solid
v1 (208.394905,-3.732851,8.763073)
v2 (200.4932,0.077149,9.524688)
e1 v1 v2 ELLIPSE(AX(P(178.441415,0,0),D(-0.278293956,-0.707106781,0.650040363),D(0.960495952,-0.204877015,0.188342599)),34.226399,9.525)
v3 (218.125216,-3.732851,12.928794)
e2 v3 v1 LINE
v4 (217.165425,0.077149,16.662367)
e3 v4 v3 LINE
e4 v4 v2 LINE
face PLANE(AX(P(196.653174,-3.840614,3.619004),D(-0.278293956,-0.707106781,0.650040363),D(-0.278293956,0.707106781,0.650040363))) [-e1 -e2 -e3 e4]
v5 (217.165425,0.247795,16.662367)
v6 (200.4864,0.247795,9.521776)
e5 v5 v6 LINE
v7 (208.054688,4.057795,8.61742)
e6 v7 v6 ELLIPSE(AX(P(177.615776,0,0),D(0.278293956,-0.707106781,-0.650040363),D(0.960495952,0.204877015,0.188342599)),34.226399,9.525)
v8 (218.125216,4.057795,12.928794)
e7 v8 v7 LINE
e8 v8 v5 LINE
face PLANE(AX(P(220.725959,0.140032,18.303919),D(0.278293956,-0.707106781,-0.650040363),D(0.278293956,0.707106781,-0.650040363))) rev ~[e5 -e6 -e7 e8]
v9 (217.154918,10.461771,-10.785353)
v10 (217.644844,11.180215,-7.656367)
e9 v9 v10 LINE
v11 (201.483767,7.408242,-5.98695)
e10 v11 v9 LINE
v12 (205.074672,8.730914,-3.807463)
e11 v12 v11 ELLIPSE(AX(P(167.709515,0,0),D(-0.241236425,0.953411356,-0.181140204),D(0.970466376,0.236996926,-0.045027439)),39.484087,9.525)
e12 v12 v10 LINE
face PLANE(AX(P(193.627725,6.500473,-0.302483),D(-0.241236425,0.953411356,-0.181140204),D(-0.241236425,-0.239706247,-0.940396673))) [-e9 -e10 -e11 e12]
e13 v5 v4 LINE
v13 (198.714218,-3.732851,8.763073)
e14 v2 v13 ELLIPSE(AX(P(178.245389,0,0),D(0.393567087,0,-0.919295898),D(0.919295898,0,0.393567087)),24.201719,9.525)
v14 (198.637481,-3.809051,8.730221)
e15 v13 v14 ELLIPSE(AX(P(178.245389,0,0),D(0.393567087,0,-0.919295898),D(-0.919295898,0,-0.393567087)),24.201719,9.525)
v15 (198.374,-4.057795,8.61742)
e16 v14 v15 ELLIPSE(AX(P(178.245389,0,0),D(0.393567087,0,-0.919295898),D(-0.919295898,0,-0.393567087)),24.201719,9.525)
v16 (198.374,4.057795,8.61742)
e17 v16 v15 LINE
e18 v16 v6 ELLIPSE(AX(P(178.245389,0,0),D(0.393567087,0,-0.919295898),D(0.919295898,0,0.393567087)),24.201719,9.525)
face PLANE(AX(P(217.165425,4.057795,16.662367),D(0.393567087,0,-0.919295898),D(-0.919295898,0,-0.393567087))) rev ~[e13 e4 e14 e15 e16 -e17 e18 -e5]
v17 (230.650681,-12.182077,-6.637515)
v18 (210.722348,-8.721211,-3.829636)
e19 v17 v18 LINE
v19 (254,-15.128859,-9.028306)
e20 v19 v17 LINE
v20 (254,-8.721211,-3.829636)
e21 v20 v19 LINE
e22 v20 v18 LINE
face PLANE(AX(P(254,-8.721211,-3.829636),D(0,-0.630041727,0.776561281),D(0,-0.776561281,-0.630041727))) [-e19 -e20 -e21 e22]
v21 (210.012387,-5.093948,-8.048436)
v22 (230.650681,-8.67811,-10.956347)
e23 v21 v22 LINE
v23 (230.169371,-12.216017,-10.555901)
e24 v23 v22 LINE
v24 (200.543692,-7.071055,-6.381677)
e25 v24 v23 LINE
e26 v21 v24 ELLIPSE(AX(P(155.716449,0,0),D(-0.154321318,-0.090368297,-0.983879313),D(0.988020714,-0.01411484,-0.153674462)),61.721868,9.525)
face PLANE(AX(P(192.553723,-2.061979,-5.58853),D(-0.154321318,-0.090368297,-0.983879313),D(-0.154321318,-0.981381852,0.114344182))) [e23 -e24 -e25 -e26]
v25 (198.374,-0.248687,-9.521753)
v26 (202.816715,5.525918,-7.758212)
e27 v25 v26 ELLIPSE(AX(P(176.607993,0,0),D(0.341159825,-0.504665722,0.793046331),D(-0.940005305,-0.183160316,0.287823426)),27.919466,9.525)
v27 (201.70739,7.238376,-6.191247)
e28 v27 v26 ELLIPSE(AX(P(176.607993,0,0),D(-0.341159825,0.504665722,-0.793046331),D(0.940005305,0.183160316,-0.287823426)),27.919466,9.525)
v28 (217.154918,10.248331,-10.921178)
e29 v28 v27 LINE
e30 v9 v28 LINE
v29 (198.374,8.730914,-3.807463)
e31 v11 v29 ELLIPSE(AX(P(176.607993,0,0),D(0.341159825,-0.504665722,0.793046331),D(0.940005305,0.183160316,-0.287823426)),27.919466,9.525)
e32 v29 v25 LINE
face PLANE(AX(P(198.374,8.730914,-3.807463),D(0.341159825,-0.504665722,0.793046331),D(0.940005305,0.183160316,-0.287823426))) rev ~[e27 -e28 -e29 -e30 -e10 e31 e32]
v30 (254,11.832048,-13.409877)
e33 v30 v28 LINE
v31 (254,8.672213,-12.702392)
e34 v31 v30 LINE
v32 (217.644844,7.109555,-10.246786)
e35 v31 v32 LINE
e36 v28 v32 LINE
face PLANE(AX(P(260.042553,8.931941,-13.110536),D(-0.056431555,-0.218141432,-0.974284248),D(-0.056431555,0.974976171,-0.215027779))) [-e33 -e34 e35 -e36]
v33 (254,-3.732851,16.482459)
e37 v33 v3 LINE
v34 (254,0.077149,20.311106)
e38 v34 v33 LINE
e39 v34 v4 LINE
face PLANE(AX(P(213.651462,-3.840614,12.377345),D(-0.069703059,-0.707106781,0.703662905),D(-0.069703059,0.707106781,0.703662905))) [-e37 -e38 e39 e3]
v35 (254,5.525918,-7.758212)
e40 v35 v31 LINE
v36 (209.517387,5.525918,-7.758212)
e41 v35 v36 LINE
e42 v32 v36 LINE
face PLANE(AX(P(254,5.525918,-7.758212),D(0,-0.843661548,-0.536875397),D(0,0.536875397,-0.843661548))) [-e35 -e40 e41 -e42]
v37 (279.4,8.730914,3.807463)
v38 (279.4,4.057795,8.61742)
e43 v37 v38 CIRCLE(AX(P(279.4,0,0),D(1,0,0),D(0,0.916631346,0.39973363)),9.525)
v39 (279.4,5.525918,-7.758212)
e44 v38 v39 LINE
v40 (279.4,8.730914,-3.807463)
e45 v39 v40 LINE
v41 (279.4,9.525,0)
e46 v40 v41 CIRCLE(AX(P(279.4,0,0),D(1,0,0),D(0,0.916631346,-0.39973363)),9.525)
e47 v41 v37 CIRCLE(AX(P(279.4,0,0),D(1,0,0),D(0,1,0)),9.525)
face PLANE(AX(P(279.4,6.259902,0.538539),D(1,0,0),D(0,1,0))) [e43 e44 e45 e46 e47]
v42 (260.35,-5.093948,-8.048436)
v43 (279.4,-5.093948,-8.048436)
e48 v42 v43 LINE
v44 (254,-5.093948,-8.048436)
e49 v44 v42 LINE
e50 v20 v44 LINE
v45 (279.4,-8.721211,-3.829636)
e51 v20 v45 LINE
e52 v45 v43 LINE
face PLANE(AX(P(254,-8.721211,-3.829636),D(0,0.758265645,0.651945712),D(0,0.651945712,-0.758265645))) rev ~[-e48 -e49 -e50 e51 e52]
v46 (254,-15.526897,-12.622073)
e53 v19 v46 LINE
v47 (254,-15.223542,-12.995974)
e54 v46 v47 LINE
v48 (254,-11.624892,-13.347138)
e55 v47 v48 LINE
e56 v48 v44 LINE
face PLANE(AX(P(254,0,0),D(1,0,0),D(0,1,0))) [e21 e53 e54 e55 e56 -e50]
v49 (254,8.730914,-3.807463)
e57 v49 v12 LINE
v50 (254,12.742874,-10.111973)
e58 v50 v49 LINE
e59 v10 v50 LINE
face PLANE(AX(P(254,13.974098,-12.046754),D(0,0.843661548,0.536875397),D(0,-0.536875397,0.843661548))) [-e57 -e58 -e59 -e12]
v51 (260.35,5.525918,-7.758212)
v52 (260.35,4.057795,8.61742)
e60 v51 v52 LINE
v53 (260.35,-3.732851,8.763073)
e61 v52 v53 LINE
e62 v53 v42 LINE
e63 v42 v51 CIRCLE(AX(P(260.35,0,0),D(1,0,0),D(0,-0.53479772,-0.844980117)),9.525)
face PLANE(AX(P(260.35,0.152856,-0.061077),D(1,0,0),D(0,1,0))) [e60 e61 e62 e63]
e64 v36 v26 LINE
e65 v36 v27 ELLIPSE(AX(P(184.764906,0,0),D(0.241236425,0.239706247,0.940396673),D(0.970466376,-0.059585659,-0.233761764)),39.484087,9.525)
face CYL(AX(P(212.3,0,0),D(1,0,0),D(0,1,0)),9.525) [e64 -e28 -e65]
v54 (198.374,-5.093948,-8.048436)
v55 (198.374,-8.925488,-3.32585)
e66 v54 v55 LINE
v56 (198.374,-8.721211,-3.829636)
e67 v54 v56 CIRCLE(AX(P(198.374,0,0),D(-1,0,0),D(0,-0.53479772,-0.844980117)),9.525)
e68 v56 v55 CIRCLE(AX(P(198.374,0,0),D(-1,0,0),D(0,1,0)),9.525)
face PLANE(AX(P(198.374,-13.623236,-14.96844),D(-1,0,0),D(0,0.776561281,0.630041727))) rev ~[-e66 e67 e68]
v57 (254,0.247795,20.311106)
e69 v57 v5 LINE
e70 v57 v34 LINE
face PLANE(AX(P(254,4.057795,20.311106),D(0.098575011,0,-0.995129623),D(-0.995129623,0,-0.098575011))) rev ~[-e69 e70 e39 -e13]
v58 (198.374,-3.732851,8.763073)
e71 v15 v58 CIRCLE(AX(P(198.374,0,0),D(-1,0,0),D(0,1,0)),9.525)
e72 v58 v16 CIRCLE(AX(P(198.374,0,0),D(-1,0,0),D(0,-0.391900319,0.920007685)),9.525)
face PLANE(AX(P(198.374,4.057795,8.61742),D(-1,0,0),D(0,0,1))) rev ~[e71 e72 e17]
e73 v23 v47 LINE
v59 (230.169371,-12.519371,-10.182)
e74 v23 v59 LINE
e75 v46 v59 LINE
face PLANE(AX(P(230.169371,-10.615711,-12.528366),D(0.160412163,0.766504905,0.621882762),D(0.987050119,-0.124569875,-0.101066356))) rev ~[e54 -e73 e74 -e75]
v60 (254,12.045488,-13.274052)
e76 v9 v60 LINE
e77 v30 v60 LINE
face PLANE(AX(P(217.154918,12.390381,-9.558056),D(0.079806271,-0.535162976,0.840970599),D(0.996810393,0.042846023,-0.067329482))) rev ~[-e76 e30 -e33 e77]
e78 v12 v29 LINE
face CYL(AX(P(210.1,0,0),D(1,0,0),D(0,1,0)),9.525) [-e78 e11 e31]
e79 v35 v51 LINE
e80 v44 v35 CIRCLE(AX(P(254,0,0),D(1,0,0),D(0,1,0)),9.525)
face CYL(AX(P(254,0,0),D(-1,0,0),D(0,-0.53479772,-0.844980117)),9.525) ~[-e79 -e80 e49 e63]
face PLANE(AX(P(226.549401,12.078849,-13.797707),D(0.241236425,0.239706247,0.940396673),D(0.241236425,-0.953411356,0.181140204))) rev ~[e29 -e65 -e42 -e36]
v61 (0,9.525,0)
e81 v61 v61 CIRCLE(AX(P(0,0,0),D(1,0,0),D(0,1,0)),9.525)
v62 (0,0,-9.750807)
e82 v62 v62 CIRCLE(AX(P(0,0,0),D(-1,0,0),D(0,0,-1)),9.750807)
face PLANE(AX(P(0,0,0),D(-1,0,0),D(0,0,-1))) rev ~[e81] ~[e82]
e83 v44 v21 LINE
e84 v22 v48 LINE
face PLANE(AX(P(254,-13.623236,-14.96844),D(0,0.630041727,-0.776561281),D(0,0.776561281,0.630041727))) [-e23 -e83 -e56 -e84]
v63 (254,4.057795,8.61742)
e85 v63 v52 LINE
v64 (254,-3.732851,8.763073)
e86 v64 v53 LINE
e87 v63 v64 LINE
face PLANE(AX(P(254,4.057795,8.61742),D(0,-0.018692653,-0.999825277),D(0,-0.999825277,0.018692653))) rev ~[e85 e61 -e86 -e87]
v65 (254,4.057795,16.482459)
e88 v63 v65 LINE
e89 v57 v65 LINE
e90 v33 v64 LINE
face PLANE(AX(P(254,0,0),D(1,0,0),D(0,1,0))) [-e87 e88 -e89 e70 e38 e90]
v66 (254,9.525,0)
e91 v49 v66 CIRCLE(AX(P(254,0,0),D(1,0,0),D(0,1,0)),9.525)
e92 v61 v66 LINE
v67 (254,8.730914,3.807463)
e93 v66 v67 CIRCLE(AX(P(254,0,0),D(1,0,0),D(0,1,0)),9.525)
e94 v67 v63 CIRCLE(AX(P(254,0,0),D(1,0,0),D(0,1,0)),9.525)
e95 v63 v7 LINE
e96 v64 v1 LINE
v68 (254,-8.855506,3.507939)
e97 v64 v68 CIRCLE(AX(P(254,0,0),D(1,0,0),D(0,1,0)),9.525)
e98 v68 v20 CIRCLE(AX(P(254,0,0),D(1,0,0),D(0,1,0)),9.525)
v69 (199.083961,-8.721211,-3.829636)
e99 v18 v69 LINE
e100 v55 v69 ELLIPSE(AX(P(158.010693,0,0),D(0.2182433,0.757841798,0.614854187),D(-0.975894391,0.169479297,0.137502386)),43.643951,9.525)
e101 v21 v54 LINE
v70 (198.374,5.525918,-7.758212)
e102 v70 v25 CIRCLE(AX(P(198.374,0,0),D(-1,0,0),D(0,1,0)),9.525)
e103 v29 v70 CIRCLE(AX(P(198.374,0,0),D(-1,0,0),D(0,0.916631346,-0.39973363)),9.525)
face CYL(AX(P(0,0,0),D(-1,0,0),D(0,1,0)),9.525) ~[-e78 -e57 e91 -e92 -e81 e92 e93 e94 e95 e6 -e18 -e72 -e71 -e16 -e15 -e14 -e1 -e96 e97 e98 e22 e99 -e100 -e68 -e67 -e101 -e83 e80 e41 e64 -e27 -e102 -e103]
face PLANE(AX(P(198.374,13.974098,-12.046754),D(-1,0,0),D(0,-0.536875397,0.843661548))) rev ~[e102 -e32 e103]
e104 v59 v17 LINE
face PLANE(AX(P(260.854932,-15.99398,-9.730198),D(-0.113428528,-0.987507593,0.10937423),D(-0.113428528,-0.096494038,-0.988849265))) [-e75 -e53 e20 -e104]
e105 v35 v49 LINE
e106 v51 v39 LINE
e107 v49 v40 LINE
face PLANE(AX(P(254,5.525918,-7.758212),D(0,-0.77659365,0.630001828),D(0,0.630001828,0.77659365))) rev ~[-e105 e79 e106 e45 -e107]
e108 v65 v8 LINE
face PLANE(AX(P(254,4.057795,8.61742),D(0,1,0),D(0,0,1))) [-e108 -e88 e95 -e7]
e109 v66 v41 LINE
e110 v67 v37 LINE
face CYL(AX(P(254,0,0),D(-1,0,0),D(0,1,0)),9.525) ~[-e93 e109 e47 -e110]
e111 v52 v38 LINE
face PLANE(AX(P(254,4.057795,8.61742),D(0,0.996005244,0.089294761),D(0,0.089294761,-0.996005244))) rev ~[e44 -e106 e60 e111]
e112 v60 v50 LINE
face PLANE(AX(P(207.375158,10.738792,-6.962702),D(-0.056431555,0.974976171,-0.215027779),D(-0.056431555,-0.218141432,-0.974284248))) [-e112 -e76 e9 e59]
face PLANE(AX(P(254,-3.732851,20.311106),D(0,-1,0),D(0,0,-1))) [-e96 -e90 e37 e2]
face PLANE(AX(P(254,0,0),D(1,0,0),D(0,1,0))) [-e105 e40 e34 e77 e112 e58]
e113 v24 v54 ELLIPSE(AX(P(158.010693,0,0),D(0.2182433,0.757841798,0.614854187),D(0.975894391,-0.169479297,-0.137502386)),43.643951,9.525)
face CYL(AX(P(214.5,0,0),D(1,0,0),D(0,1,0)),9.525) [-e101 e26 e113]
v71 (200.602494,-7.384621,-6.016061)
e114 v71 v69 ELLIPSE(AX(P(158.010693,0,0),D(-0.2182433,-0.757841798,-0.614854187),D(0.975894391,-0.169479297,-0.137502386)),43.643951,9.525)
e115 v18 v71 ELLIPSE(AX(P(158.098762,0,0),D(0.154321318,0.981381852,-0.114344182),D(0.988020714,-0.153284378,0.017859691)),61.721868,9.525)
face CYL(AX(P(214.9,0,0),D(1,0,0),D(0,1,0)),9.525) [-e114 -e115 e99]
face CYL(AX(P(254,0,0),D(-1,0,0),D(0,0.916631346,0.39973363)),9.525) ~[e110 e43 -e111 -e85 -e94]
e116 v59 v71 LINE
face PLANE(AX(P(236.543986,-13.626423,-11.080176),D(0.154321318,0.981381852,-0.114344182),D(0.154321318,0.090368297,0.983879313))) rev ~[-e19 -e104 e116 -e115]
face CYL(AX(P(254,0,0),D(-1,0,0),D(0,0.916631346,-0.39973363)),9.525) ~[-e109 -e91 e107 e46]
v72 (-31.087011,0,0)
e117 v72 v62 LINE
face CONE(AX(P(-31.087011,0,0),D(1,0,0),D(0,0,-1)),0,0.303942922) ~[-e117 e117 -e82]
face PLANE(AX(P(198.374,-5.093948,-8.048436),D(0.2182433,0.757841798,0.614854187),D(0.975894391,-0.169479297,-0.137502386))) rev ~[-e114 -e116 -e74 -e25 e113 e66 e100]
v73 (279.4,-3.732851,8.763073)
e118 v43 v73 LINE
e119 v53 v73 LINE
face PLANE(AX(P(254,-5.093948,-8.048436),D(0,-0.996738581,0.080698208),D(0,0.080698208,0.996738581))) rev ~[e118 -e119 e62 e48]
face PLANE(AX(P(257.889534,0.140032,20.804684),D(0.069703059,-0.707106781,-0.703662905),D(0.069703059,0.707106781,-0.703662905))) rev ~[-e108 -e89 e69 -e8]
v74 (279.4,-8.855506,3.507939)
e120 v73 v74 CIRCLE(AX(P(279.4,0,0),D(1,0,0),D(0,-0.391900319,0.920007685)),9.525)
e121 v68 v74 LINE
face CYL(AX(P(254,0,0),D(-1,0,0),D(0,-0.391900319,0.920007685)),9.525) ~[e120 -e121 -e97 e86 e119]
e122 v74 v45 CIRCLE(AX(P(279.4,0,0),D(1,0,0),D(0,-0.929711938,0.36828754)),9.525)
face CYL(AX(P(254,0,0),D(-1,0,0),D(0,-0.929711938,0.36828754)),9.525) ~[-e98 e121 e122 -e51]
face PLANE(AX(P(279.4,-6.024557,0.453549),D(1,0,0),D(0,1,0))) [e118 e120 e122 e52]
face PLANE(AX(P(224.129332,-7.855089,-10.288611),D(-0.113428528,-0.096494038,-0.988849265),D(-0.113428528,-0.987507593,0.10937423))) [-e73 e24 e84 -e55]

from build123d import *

# Parameters (mm, degrees)
F0_R          = 9.525
F1_DEPTH      = 254
F5_DEPTH      = 55.626
F7_DEPTH      = 6.35
F8_DEPTH      = 25.4
F10_DEPTH     = 25.4
F12_DEPTH     = 25.4
F14_DEPTH     = 25.4
F15_T1_DEPTH  = 44.8533405939
F15_T3_DEPTH  = 44.8533405939
F15_T8_DEPTH  = 28.2795963183
F15_S9_R      = 9.525
F15_T10_DEPTH = 17
F15_T14_DEPTH = 27.9095113127
F15_S15_R     = 9.525
F15_T16_DEPTH = 17
F16_T1_DEPTH  = 52.8359208118
F16_T3_DEPTH  = 52.8359208118
F16_T8_DEPTH  = 31.126263523
F16_S9_R      = 9.525
F16_T10_DEPTH = 18
F16_T14_DEPTH = 35.8525293061
F16_S15_R     = 9.525
F16_T16_DEPTH = 20
F17_T1_DEPTH  = 37.2074314298
F17_T3_DEPTH  = 37.2074314298
F17_T8_DEPTH  = 45.6448991689
F17_S9_R      = 9.525
F17_T10_DEPTH = 25
F17_T14_DEPTH = 44.9174010309
F17_S15_R     = 9.525
F17_T16_DEPTH = 25


# Not quite as in the source:
# - a fillet or chamfer that OpenCascade refuses, or shapes differently, is made with other operations: its cross-section is extruded or revolved along the edge and cut away or added
# - a feature names something its author has since deleted; it is built from what else it names


with BuildPart() as f1:
    # F0 (on Right) → F1 (new body)
    with BuildSketch(Plane.YZ):
        Circle(F0_R)
    extrude(amount=F1_DEPTH)

    # F2 (on Front) → F3 (revolve)
    with BuildSketch(Plane.XZ):
        Polygon((0, -9.7508067265), (0, 0), (-31.0870110989, 0), align=None)
    revolve(axis=Axis((-15.5435055494, 0, 0), (-1, 0, 0)))

    # F4 (on face) → F5 (join)
    with BuildSketch(Plane.YZ.offset(254)):
        with BuildLine():
            ThreePointArc((-3.7328505423, 8.7630731955), (0.1780475173, 9.5233357644), (4.0577948396, 8.6174199178))
            Line((4.0577948396, 8.6174199178), (4.0577948396, 20.311106017))
            Line((4.0577948396, 20.311106017), (-3.7328505423, 20.311106017))
            Line((-3.7328505423, 20.311106017), (-3.7328505423, 8.7630731955))
        make_face()
        with BuildLine():
            ThreePointArc((-5.0939482873, -8.0484356149), (-7.2224802699, -6.2097829069), (-8.7212105654, -3.8296359191))
            Line((-8.7212105654, -3.8296359191), (-17.1272028238, -10.6496075168))
            Line((-17.1272028238, -10.6496075168), (-13.6232364185, -14.9684399422))
            Line((-13.6232364185, -14.9684399422), (-5.0939482873, -8.0484356149))
        make_face()
        with BuildLine():
            Line((13.9740978255, -12.0467544007), (8.7309135752, -3.8074628223))
            ThreePointArc((8.7309135752, -3.8074628223), (7.3970545146, -6.0007674099), (5.5259177996, -7.75821226))
            Line((5.5259177996, -7.75821226), (9.9034377135, -14.6371738298))
            Line((9.9034377135, -14.6371738298), (13.9740978255, -12.0467544007))
        make_face()
    extrude(amount=-F5_DEPTH)

    # F6 (on face) → F7 (join)
    with BuildSketch(Plane.YZ.offset(254)):
        Polygon((4.0577948396, 8.6174199178), (-3.7328505423, 8.7630731955), (-5.0939482873, -8.0484356149), (5.5259177996, -7.75821226), align=None)
        with BuildLine():
            Line((5.5259177996, -7.75821226), (-5.0939482873, -8.0484356149))
            ThreePointArc((-5.0939482873, -8.0484356149), (0.2602053301, -9.5214451732), (5.5259177996, -7.75821226))
        make_face()
    extrude(amount=F7_DEPTH)

    # F6 (on face) → F8 (join)
    with BuildSketch(Plane.YZ.offset(254)):
        Polygon((-5.0939482873, -8.0484356149), (-3.7328505423, 8.7630731955), (-8.8555062097, 3.5079388207), (-8.7212105654, -3.8296359191), align=None)
        Polygon((8.7309135752, 3.8074628223), (4.0577948396, 8.6174199178), (5.5259177996, -7.75821226), (8.7309135752, -3.8074628223), align=None)
        with BuildLine():
            ThreePointArc((9.525, 0), (9.3243653083, 1.9446944743), (8.7309135752, 3.8074628223))
            Line((8.7309135752, 3.8074628223), (8.7309135752, -3.8074628223))
            ThreePointArc((8.7309135752, -3.8074628223), (9.3243653083, -1.9446944743), (9.525, 0))
        make_face()
        with BuildLine():
            ThreePointArc((8.7309135752, 3.8074628223), (6.8316679914, 6.6373140242), (4.0577948396, 8.6174199178))
            Line((4.0577948396, 8.6174199178), (8.7309135752, 3.8074628223))
        make_face()
        with BuildLine():
            Line((-8.7212105654, -3.8296359191), (-8.8555062097, 3.5079388207))
            ThreePointArc((-8.8555062097, 3.5079388207), (-9.5234050588, -0.1743017091), (-8.7212105654, -3.8296359191))
        make_face()
        with BuildLine():
            Line((-8.8555062097, 3.5079388207), (-3.7328505423, 8.7630731955))
            ThreePointArc((-3.7328505423, 8.7630731955), (-6.8206151301, 6.6486716152), (-8.8555062097, 3.5079388207))
        make_face()
    extrude(amount=F8_DEPTH)

    # F9 (on face) → F10 (cut)
    with BuildSketch(Plane(origin=(0, 4.0577948396, 0), x_dir=(-1, 0, 0), z_dir=(0, 1, 0))):
        Polygon((-217.1654254198, 16.6623666883), (-198.374, 8.6174199178), (-198.374, 20.311106017), (-254, 20.311106017), align=None)
    extrude(amount=-F10_DEPTH, mode=Mode.SUBTRACT)

    # F11 (on face) → F12 (cut)
    with BuildSketch(Plane(origin=(0, 4.4898005119, 2.8571450721), x_dir=(-1, 0, 0), z_dir=(0, 0.843661548, 0.5368753975))):
        Polygon((-198.374, -7.8996226746), (-217.1549183124, -14.7158552648), (-254, -17.6657327906), (-198.374, -17.6657327906), align=None)
    extrude(amount=-F12_DEPTH, mode=Mode.SUBTRACT)

    # F13 (on face) → F14 (cut)
    with BuildSketch(Plane(origin=(0, 1.9157700793, -2.3612925984), x_dir=(1, 0, 0), z_dir=(0, 0.6300417268, -0.7765612806))):
        Polygon((230.1693707705, 16.137143597), (254, 20.0100196673), (198.374, 20.0100196673), (198.374, 9.0266132778), align=None)
    extrude(amount=-F14_DEPTH, mode=Mode.SUBTRACT)

    # F15: chamfer of 3.81 on 4 edges, made by hand

    # F15_s2 → F15_t1 (cut)
    with BuildSketch(Plane(origin=(257.4244465349, 0, 25.499811331), x_dir=(0, 1, 0), z_dir=(-0.9951296233, 0, -0.098575011))):
        with BuildLine():
            Line((0.1400317661, 4.7181064364), (4.165557913, 8.7436325833))
            Line((4.165557913, 8.7436325833), (4.241757913, 8.7436325833))
            ThreePointArc((4.241757913, 8.7436325833), (4.1339948396, 6.7847510466), (4.1339948396, 4.8258695099))
            Line((4.1339948396, 4.8258695099), (4.0577948396, 4.7496695099))
            ThreePointArc((4.0577948396, 4.7496695099), (2.0989133028, 4.7496695099), (0.1400317661, 4.6419064364))
            Line((0.1400317661, 4.6419064364), (0.1400317661, 4.7181064364))
        make_face()
    extrude(amount=F15_T1_DEPTH, mode=Mode.SUBTRACT)

    # F15_s4 → F15_t3 (cut)
    with BuildSketch(Plane(origin=(212.789558605, 0, 21.0783927893), x_dir=(0, 1, 0), z_dir=(0.9951296233, 0, 0.098575011))):
        with BuildLine():
            Line((-3.8406136157, -8.7436325833), (0.1849125312, -4.7181064364))
            Line((0.1849125312, -4.7181064364), (0.1849125312, -4.6419064364))
            ThreePointArc((0.1849125312, -4.6419064364), (-1.7739690056, -4.7496695099), (-3.7328505423, -4.7496695099))
            Line((-3.7328505423, -4.7496695099), (-3.8090505423, -4.8258695099))
            ThreePointArc((-3.8090505423, -4.8258695099), (-3.8090505423, -6.7847510466), (-3.9168136157, -8.7436325833))
            Line((-3.9168136157, -8.7436325833), (-3.8406136157, -8.7436325833))
        make_face()
    extrude(amount=F15_T3_DEPTH, mode=Mode.SUBTRACT)


with BuildPart() as f15_tool6:
    # F15_s7 → F15_t8 (new body)
    with BuildSketch(Plane(origin=(193.1590423404, 0, 82.6948557196), x_dir=(0, 1, 0), z_dir=(-0.9192958979, 0, -0.3935670871))):
        with BuildLine():
            Line((0.1400317661, 70.0437554835), (4.165557913, 74.0692816304))
            Line((4.165557913, 74.0692816304), (4.241757913, 74.0692816304))
            ThreePointArc((4.241757913, 74.0692816304), (4.1339948396, 72.1104000937), (4.1339948396, 70.1515185569))
            Line((4.1339948396, 70.1515185569), (4.0577948396, 70.0753185569))
            ThreePointArc((4.0577948396, 70.0753185569), (2.0989133028, 70.0753185569), (0.1400317661, 69.9675554835))
            Line((0.1400317661, 69.9675554835), (0.1400317661, 70.0437554835))
        make_face()
    extrude(amount=F15_T8_DEPTH)

    # F15_s9 → F15_t10 (cut, symmetric)
    with BuildSketch(Plane.YZ.offset(208.5)):
        Circle(F15_S9_R)
    extrude(amount=F15_T10_DEPTH, both=True, mode=Mode.SUBTRACT)


with BuildPart() as f1_1:
    add(f1.part)

    # F15_t5: cut F15_tool6
    add(f15_tool6.part, mode=Mode.SUBTRACT)


with BuildPart() as f15_tool12:
    # F15_s13 → F15_t14 (new body)
    with BuildSketch(Plane(origin=(167.5019430775, 0, 71.7105906496), x_dir=(0, 1, 0), z_dir=(0.9192958979, 0, 0.3935670871))):
        with BuildLine():
            Line((-3.8406136157, -74.0692816304), (0.1849125312, -70.0437554835))
            Line((0.1849125312, -70.0437554835), (0.1849125312, -69.9675554835))
            ThreePointArc((0.1849125312, -69.9675554835), (-1.7739690056, -70.0753185569), (-3.7328505423, -70.0753185569))
            Line((-3.7328505423, -70.0753185569), (-3.8090505423, -70.1515185569))
            ThreePointArc((-3.8090505423, -70.1515185569), (-3.8090505423, -72.1104000937), (-3.9168136157, -74.0692816304))
            Line((-3.9168136157, -74.0692816304), (-3.8406136157, -74.0692816304))
        make_face()
    extrude(amount=F15_T14_DEPTH)

    # F15_s15 → F15_t16 (cut, symmetric)
    with BuildSketch(Plane.YZ.offset(208.7)):
        Circle(F15_S15_R)
    extrude(amount=F15_T16_DEPTH, both=True, mode=Mode.SUBTRACT)


with BuildPart() as f1_2:
    add(f1_1.part)

    # F15_t11: cut F15_tool12
    add(f15_tool12.part, mode=Mode.SUBTRACT)

    # F16: chamfer of 2.286 on 4 edges, made by hand

    # F16_s2 → F16_t1 (cut)
    with BuildSketch(Plane(origin=(259.6477190804, 11.1604697827, -17.5378854343), x_dir=(0.042943471, -0.9990775037, 0), z_dir=(-0.9968103928, -0.0428460235, 0.0673294822))):
        Polygon((2.2434282818, 4.4374187115), (-0.9134913616, 3.7406760293), (1.0133398012, 2.5105875487), align=None)
    extrude(amount=F16_T1_DEPTH, mode=Mode.SUBTRACT)

    # F16_s4 → F16_t3 (cut)
    with BuildSketch(Plane(origin=(206.9803241045, 8.8966606792, -13.980470247), x_dir=(-0.042943471, 0.9990775037, 0), z_dir=(0.9968103928, 0.0428460235, -0.0673294822))):
        Polygon((1.823476661, 7.0337297004), (1.1267339788, 3.8768100571), (3.0535651416, 5.1068985377), align=None)
    extrude(amount=F16_T3_DEPTH, mode=Mode.SUBTRACT)


with BuildPart() as f16_tool6:
    # F16_s7 → F16_t8 (new body)
    with BuildSketch(Plane(origin=(205.9939924457, 40.1379913763, -63.0740020828), x_dir=(0.1912534961, -0.9815406768, 0), z_dir=(-0.9400053053, -0.1831603164, 0.2878234257))):
        Polygon((31.47248323, 51.4536328512), (34.6470195867, 52.0651154105), (33.365492688, 50.1721059525), align=None)
    extrude(amount=F16_T8_DEPTH)

    # F16_s9 → F16_t10 (cut, symmetric)
    with BuildSketch(Plane.YZ.offset(212.3)):
        Circle(F16_S9_R)
    extrude(amount=F16_T10_DEPTH, both=True, mode=Mode.SUBTRACT)


with BuildPart() as f1_3:
    add(f1_2.part)

    # F16_t5: cut F16_tool6
    add(f16_tool6.part, mode=Mode.SUBTRACT)


with BuildPart() as f16_tool12:
    # F16_s13 → F16_t14 (new body)
    with BuildSketch(Plane(origin=(172.2924246879, 33.5712307637, -52.7548042766), x_dir=(-0.1912534961, 0.9815406768, 0), z_dir=(0.9400053053, 0.1831603164, -0.2878234257))):
        Polygon((-30.6515011053, 54.7699959311), (-31.2629836646, 51.5954595744), (-29.3699742066, 52.8769864731), align=None)
    extrude(amount=F16_T14_DEPTH)

    # F16_s15 → F16_t16 (cut, symmetric)
    with BuildSketch(Plane.YZ.offset(210.1)):
        Circle(F16_S15_R)
    extrude(amount=F16_T16_DEPTH, both=True, mode=Mode.SUBTRACT)


with BuildPart() as f1_4:
    add(f1_3.part)

    # F16_t11: cut F16_tool12
    add(f16_tool12.part, mode=Mode.SUBTRACT)

    # F17: chamfer of 2.54 on 4 edges, made by hand

    # F17_s2 → F17_t1 (cut)
    with BuildSketch(Plane(origin=(220.3542251508, -27.8096296574, -22.5625813797), x_dir=(0.1252109944, 0.9921301361, 0), z_dir=(0.9870501192, -0.1245698749, -0.1010663563))):
        Polygon((20.2701864549, 12.3371401962), (16.6998573856, 12.7320456743), (18.2875691812, 10.7494284006), align=None)
    extrude(amount=F17_T1_DEPTH, mode=Mode.SUBTRACT)

    # F17_s4 → F17_t3 (cut)
    with BuildSketch(Plane(origin=(257.0798247798, -32.4445547373, -26.3230009032), x_dir=(-0.1252109944, -0.9921301361, 0), z_dir=(-0.9870501192, 0.1245698749, 0.1010663563))):
        Polygon((-16.7937957885, 16.6782002076), (-16.3988903104, 13.1078711382), (-14.8111785147, 15.090488412), align=None)
    extrude(amount=F17_T3_DEPTH, mode=Mode.SUBTRACT)


with BuildPart() as f17_tool6:
    # F17_s7 → F17_t8 (new body)
    with BuildSketch(Plane(origin=(184.4733137003, -32.036670961, -25.9920755723), x_dir=(0.1711045444, 0.9852528787, 0), z_dir=(0.9758943907, -0.1694792968, -0.1375023858))):
        Polygon((30.9152465813, 20.5992083681), (27.3471595892, 21.0138832013), (28.9238656686, 19.0225022887), align=None)
    extrude(amount=F17_T8_DEPTH)

    # F17_s9 → F17_t10 (cut, symmetric)
    with BuildSketch(Plane.YZ.offset(214.5)):
        Circle(F17_S9_R)
    extrude(amount=F17_T10_DEPTH, both=True, mode=Mode.SUBTRACT)


with BuildPart() as f1_5:
    add(f1_4.part)

    # F17_t5: cut F17_tool6
    add(f17_tool6.part, mode=Mode.SUBTRACT)


with BuildPart() as f17_tool12:
    # F17_s13 → F17_t14 (new body)
    with BuildSketch(Plane(origin=(229.0179147643, -39.7725363756, -32.2683581086), x_dir=(-0.1711045444, -0.9852528787, 0), z_dir=(-0.9758943907, 0.1694792968, 0.1375023858))):
        Polygon((-27.0482787605, 21.3913699029), (-27.4629535937, 24.959456895), (-25.4715726811, 23.3827508156), align=None)
    extrude(amount=F17_T14_DEPTH)

    # F17_s15 → F17_t16 (cut, symmetric)
    with BuildSketch(Plane.YZ.offset(214.9)):
        Circle(F17_S15_R)
    extrude(amount=F17_T16_DEPTH, both=True, mode=Mode.SUBTRACT)


with BuildPart() as f1_6:
    add(f1_5.part)

    # F17_t11: cut F17_tool12
    add(f17_tool12.part, mode=Mode.SUBTRACT)


solid = f1_6.part
